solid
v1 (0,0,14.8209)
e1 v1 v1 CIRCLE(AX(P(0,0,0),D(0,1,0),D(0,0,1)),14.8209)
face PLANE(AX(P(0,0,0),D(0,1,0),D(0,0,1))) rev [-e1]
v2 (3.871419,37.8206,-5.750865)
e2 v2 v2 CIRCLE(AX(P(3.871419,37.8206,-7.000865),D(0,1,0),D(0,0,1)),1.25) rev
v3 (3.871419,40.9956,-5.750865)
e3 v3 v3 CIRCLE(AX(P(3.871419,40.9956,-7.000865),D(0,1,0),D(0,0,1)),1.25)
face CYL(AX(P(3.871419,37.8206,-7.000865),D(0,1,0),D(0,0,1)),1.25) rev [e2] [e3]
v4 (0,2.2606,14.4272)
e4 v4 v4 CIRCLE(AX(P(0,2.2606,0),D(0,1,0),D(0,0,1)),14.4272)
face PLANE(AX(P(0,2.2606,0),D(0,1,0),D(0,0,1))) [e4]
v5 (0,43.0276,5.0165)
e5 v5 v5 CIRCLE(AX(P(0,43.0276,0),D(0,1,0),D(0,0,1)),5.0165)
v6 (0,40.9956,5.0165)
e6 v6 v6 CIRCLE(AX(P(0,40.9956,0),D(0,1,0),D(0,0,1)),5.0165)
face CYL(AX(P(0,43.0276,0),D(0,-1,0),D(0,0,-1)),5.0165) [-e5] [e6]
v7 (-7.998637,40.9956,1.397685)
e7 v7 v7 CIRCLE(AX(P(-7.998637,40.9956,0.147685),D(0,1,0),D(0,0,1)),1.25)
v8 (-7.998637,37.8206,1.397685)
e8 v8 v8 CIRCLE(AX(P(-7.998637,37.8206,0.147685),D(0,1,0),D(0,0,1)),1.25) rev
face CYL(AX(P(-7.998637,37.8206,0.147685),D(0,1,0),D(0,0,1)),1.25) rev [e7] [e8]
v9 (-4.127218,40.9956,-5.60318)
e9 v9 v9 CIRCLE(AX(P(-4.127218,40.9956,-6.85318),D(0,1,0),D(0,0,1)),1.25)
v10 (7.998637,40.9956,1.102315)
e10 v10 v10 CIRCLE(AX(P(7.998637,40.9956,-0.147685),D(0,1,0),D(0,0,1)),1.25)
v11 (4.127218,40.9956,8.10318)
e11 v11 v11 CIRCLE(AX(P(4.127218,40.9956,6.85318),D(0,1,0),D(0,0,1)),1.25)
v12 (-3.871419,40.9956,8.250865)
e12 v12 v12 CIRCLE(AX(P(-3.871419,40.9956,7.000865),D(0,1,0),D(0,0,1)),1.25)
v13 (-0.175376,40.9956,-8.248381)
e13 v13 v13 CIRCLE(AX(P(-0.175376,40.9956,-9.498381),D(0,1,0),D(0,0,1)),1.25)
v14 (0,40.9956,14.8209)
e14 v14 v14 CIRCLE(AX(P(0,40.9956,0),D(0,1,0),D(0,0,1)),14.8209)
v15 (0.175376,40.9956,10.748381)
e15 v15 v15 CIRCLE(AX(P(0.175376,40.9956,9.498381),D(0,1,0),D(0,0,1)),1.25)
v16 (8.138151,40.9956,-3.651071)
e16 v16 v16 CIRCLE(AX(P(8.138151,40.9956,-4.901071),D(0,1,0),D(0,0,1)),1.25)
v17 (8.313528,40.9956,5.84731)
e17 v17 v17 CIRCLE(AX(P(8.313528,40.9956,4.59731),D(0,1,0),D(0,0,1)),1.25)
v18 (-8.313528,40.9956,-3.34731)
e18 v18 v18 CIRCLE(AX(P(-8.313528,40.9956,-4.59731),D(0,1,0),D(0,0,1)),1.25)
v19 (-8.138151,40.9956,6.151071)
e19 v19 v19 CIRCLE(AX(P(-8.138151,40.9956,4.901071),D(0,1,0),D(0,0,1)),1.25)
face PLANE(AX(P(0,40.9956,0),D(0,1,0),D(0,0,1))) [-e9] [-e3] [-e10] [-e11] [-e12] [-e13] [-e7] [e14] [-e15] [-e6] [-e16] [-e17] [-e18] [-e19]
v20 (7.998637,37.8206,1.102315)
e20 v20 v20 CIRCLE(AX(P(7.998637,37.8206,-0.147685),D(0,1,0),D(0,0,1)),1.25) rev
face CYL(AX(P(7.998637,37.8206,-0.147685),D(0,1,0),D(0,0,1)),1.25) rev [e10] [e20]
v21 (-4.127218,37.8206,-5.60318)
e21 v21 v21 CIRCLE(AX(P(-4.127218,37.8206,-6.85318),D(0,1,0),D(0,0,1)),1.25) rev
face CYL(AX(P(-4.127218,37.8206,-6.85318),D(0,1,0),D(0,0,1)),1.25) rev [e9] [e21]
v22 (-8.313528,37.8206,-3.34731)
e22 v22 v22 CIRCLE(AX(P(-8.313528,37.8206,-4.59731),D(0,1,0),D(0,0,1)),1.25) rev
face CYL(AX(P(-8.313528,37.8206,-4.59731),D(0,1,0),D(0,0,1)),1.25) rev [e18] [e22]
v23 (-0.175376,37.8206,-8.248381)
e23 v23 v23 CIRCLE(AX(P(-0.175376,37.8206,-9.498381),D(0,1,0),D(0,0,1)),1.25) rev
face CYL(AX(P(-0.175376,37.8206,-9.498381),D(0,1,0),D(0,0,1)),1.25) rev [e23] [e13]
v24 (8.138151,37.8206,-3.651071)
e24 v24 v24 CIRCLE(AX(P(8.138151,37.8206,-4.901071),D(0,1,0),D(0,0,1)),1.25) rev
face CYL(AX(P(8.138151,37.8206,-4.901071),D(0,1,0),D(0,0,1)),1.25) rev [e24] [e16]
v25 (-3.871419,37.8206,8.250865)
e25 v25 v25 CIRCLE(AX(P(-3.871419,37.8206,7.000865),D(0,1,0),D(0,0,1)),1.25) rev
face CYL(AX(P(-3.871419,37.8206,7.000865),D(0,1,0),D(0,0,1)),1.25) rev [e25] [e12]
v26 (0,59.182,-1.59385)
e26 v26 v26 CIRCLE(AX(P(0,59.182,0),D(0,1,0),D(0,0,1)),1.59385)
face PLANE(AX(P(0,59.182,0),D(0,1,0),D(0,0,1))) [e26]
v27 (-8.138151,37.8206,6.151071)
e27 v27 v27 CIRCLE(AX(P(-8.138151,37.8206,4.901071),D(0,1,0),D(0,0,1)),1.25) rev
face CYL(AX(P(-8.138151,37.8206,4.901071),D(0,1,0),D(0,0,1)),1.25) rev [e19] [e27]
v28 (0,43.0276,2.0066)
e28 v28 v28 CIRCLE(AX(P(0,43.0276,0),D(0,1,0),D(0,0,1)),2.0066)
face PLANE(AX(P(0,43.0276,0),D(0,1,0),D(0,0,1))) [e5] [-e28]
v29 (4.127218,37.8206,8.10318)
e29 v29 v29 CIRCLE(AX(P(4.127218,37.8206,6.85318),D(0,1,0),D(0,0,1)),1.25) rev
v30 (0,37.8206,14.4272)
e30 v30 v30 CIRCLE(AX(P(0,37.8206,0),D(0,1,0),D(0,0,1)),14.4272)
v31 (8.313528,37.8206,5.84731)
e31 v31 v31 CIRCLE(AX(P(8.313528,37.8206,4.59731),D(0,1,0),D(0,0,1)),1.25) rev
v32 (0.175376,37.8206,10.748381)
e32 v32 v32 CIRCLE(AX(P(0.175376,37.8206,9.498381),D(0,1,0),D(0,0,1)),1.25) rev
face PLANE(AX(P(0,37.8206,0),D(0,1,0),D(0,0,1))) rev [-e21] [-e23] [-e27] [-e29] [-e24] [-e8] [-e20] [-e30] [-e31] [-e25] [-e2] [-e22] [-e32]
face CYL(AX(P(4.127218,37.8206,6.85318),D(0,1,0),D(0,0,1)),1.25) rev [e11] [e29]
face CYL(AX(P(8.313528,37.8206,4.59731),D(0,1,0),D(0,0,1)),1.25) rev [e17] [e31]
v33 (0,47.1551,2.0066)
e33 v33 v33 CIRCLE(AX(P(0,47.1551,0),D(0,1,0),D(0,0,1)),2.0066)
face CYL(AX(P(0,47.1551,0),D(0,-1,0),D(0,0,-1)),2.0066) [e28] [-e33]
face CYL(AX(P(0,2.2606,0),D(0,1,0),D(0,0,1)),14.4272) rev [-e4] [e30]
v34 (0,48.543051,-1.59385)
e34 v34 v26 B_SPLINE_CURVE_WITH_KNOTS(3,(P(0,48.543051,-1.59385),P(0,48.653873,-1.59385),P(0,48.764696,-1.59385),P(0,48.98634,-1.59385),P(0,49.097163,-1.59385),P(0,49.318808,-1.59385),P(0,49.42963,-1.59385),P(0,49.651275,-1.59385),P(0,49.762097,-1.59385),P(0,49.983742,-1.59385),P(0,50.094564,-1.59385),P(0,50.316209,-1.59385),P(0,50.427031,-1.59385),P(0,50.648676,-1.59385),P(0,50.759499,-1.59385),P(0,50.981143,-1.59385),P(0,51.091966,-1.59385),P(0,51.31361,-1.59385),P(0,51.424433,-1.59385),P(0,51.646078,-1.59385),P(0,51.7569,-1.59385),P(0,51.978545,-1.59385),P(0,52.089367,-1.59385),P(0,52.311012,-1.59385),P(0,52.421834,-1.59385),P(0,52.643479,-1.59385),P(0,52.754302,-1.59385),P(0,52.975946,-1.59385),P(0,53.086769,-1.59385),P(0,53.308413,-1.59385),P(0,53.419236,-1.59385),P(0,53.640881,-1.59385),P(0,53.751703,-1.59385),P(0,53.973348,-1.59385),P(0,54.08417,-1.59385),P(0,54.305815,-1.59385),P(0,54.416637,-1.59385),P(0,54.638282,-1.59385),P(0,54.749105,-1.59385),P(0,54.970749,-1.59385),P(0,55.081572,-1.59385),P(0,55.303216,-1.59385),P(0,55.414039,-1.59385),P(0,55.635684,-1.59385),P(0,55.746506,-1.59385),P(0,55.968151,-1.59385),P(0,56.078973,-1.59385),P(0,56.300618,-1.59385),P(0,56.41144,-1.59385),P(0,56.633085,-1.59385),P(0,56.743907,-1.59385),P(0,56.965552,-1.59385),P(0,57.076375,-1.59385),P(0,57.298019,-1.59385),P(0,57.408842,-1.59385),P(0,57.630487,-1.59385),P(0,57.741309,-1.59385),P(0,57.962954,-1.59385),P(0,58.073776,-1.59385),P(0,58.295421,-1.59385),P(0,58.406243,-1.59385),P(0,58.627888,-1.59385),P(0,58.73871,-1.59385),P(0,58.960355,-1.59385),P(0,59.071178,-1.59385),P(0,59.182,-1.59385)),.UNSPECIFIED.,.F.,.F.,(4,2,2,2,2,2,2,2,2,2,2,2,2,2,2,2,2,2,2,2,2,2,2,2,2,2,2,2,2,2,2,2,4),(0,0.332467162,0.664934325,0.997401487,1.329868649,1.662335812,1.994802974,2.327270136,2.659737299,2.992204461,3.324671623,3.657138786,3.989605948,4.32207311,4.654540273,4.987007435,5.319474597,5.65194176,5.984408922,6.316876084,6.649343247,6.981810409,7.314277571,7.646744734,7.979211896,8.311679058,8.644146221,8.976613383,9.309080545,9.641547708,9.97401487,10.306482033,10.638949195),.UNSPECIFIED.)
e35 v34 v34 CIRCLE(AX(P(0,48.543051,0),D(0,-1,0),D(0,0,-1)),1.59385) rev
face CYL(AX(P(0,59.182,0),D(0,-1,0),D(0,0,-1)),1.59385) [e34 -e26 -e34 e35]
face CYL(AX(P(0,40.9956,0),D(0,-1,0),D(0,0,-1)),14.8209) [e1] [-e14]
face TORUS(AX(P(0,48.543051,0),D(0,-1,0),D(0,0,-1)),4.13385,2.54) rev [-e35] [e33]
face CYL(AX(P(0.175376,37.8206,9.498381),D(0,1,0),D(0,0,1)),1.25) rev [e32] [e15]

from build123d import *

# Parameters (mm, degrees)
SKETCH1_R           = 14.8209
BOSS_EXTRUDE1_DEPTH = 40.9956
SKETCH2_R           = 5.0165
BOSS_EXTRUDE2_DEPTH = 2.032
SKETCH3_R           = 2.0066
BOSS_EXTRUDE3_DEPTH = 4.1275
SKETCH4_R           = 1.59385
BOSS_EXTRUDE4_DEPTH = 12.0269
FILLET1_R           = 2.54
SKETCH5_R           = 1.25
CUT_EXTRUDE1_DEPTH  = 3.175
SKETCH6_R           = 14.4272
CUT_EXTRUDE2_DEPTH  = 35.56


with BuildPart() as part:
    # Sketch1 → Boss-Extrude1 (new body)
    with BuildSketch(Plane(origin=(0, 0, 0), x_dir=(1, 0, 0), z_dir=(0, 1, 0))):
        with Locations(Location((0, 0, 0), (0, 0, 270))):
            Circle(SKETCH1_R)
    extrude(amount=BOSS_EXTRUDE1_DEPTH)

    # Sketch2 → Boss-Extrude2 (add)
    with BuildSketch(Plane(origin=(0, 40.9956, 0), x_dir=(1, 0, 0), z_dir=(0, 1, 0))):
        with Locations(Location((0, 0, 0), (0, 0, 270))):
            Circle(SKETCH2_R)
    extrude(amount=BOSS_EXTRUDE2_DEPTH)

    # Sketch3 → Boss-Extrude3 (add)
    with BuildSketch(Plane(origin=(0, 43.0276, 0), x_dir=(1, 0, 0), z_dir=(0, 1, 0))):
        with Locations(Location((0, 0, 0), (0, 0, 270))):
            Circle(SKETCH3_R)
    extrude(amount=BOSS_EXTRUDE3_DEPTH)

    # Sketch4 → Boss-Extrude4 (add)
    with BuildSketch(Plane(origin=(0, 47.1551, 0), x_dir=(1, 0, 0), z_dir=(0, 1, 0))):
        with Locations(Location((0, 0, 0), (0, 0, 90))):
            Circle(SKETCH4_R)
    extrude(amount=BOSS_EXTRUDE4_DEPTH)

    # Fillet1
    # the kernel refuses this fillet: 2.54 mm, written as the material it adds along each edge
    with BuildSketch(Plane(origin=(0, 47.1551, 0), x_dir=(0, 0, -1), z_dir=(1, 0, 0))) as fillet1_piece_1:
        with BuildLine():
            CenterArc((4.13385, 1.387950805), FILLET1_R, 180, 33.122940208)
            Line((1.59385, 1.387950805), (1.54305, 1.387950805))
            Line((1.54305, 1.387950805), (1.54305, 0))
            Line((1.54305, 0), (1.59385, -0.0508))
            ThreePointArc((1.59385, -0.0508), (1.800225, -0.0508), (1.964055, -0.027759016))
            Line((1.964055, -0.027759016), (2.0066, 0))
        make_face()
    revolve(axis=Axis((0, 47.1551, 0), (0, 1, 0)))

    # Sketch5 → Cut-Extrude1 (cut)
    with BuildSketch(Plane(origin=(0, 40.9956, 0), x_dir=(1, 0, 0), z_dir=(0, 1, 0))):
        with Locations(Location((-0.175376493, 9.498381077, 0), (0, 0, 270))):
            Circle(SKETCH5_R)
        with Locations(Location((3.871418981, 7.000865309, 0), (0, 0, 270))):
            Circle(SKETCH5_R)
        with Locations(Location((8.138151061, 4.901071037, 0), (0, 0, 270))):
            Circle(SKETCH5_R)
        with Locations(Location((7.998636697, 0.147685468, 0), (0, 0, 270))):
            Circle(SKETCH5_R)
        with Locations(Location((8.313527554, -4.59731004, 0), (0, 0, 270))):
            Circle(SKETCH5_R)
        with Locations(Location((0.175376493, -9.498381077, 0), (0, 0, 270))):
            Circle(SKETCH5_R)
        with Locations(Location((-3.871418981, -7.000865309, 0), (0, 0, 270))):
            Circle(SKETCH5_R)
        with Locations(Location((-8.138151061, -4.901071037, 0), (0, 0, 270))):
            Circle(SKETCH5_R)
        with Locations(Location((-7.998636697, -0.147685468, 0), (0, 0, 270))):
            Circle(SKETCH5_R)
        with Locations(Location((-4.127217715, 6.853179841, 0), (0, 0, 270))):
            Circle(SKETCH5_R)
        with Locations(Location((-8.313527554, 4.59731004, 0), (0, 0, 270))):
            Circle(SKETCH5_R)
        with Locations(Location((4.127217715, -6.853179841, 0), (0, 0, 270))):
            Circle(SKETCH5_R)
    extrude(amount=-CUT_EXTRUDE1_DEPTH, mode=Mode.SUBTRACT)

    # Sketch6 → Cut-Extrude2 (cut)
    with BuildSketch(Plane(origin=(0, 37.8206, 0), x_dir=(1, 0, 0), z_dir=(0, 1, 0))):
        with Locations(Location((0, 0, 0), (0, 0, 270))):
            Circle(SKETCH6_R)
    extrude(amount=-CUT_EXTRUDE2_DEPTH, mode=Mode.SUBTRACT)


solid = part.part
